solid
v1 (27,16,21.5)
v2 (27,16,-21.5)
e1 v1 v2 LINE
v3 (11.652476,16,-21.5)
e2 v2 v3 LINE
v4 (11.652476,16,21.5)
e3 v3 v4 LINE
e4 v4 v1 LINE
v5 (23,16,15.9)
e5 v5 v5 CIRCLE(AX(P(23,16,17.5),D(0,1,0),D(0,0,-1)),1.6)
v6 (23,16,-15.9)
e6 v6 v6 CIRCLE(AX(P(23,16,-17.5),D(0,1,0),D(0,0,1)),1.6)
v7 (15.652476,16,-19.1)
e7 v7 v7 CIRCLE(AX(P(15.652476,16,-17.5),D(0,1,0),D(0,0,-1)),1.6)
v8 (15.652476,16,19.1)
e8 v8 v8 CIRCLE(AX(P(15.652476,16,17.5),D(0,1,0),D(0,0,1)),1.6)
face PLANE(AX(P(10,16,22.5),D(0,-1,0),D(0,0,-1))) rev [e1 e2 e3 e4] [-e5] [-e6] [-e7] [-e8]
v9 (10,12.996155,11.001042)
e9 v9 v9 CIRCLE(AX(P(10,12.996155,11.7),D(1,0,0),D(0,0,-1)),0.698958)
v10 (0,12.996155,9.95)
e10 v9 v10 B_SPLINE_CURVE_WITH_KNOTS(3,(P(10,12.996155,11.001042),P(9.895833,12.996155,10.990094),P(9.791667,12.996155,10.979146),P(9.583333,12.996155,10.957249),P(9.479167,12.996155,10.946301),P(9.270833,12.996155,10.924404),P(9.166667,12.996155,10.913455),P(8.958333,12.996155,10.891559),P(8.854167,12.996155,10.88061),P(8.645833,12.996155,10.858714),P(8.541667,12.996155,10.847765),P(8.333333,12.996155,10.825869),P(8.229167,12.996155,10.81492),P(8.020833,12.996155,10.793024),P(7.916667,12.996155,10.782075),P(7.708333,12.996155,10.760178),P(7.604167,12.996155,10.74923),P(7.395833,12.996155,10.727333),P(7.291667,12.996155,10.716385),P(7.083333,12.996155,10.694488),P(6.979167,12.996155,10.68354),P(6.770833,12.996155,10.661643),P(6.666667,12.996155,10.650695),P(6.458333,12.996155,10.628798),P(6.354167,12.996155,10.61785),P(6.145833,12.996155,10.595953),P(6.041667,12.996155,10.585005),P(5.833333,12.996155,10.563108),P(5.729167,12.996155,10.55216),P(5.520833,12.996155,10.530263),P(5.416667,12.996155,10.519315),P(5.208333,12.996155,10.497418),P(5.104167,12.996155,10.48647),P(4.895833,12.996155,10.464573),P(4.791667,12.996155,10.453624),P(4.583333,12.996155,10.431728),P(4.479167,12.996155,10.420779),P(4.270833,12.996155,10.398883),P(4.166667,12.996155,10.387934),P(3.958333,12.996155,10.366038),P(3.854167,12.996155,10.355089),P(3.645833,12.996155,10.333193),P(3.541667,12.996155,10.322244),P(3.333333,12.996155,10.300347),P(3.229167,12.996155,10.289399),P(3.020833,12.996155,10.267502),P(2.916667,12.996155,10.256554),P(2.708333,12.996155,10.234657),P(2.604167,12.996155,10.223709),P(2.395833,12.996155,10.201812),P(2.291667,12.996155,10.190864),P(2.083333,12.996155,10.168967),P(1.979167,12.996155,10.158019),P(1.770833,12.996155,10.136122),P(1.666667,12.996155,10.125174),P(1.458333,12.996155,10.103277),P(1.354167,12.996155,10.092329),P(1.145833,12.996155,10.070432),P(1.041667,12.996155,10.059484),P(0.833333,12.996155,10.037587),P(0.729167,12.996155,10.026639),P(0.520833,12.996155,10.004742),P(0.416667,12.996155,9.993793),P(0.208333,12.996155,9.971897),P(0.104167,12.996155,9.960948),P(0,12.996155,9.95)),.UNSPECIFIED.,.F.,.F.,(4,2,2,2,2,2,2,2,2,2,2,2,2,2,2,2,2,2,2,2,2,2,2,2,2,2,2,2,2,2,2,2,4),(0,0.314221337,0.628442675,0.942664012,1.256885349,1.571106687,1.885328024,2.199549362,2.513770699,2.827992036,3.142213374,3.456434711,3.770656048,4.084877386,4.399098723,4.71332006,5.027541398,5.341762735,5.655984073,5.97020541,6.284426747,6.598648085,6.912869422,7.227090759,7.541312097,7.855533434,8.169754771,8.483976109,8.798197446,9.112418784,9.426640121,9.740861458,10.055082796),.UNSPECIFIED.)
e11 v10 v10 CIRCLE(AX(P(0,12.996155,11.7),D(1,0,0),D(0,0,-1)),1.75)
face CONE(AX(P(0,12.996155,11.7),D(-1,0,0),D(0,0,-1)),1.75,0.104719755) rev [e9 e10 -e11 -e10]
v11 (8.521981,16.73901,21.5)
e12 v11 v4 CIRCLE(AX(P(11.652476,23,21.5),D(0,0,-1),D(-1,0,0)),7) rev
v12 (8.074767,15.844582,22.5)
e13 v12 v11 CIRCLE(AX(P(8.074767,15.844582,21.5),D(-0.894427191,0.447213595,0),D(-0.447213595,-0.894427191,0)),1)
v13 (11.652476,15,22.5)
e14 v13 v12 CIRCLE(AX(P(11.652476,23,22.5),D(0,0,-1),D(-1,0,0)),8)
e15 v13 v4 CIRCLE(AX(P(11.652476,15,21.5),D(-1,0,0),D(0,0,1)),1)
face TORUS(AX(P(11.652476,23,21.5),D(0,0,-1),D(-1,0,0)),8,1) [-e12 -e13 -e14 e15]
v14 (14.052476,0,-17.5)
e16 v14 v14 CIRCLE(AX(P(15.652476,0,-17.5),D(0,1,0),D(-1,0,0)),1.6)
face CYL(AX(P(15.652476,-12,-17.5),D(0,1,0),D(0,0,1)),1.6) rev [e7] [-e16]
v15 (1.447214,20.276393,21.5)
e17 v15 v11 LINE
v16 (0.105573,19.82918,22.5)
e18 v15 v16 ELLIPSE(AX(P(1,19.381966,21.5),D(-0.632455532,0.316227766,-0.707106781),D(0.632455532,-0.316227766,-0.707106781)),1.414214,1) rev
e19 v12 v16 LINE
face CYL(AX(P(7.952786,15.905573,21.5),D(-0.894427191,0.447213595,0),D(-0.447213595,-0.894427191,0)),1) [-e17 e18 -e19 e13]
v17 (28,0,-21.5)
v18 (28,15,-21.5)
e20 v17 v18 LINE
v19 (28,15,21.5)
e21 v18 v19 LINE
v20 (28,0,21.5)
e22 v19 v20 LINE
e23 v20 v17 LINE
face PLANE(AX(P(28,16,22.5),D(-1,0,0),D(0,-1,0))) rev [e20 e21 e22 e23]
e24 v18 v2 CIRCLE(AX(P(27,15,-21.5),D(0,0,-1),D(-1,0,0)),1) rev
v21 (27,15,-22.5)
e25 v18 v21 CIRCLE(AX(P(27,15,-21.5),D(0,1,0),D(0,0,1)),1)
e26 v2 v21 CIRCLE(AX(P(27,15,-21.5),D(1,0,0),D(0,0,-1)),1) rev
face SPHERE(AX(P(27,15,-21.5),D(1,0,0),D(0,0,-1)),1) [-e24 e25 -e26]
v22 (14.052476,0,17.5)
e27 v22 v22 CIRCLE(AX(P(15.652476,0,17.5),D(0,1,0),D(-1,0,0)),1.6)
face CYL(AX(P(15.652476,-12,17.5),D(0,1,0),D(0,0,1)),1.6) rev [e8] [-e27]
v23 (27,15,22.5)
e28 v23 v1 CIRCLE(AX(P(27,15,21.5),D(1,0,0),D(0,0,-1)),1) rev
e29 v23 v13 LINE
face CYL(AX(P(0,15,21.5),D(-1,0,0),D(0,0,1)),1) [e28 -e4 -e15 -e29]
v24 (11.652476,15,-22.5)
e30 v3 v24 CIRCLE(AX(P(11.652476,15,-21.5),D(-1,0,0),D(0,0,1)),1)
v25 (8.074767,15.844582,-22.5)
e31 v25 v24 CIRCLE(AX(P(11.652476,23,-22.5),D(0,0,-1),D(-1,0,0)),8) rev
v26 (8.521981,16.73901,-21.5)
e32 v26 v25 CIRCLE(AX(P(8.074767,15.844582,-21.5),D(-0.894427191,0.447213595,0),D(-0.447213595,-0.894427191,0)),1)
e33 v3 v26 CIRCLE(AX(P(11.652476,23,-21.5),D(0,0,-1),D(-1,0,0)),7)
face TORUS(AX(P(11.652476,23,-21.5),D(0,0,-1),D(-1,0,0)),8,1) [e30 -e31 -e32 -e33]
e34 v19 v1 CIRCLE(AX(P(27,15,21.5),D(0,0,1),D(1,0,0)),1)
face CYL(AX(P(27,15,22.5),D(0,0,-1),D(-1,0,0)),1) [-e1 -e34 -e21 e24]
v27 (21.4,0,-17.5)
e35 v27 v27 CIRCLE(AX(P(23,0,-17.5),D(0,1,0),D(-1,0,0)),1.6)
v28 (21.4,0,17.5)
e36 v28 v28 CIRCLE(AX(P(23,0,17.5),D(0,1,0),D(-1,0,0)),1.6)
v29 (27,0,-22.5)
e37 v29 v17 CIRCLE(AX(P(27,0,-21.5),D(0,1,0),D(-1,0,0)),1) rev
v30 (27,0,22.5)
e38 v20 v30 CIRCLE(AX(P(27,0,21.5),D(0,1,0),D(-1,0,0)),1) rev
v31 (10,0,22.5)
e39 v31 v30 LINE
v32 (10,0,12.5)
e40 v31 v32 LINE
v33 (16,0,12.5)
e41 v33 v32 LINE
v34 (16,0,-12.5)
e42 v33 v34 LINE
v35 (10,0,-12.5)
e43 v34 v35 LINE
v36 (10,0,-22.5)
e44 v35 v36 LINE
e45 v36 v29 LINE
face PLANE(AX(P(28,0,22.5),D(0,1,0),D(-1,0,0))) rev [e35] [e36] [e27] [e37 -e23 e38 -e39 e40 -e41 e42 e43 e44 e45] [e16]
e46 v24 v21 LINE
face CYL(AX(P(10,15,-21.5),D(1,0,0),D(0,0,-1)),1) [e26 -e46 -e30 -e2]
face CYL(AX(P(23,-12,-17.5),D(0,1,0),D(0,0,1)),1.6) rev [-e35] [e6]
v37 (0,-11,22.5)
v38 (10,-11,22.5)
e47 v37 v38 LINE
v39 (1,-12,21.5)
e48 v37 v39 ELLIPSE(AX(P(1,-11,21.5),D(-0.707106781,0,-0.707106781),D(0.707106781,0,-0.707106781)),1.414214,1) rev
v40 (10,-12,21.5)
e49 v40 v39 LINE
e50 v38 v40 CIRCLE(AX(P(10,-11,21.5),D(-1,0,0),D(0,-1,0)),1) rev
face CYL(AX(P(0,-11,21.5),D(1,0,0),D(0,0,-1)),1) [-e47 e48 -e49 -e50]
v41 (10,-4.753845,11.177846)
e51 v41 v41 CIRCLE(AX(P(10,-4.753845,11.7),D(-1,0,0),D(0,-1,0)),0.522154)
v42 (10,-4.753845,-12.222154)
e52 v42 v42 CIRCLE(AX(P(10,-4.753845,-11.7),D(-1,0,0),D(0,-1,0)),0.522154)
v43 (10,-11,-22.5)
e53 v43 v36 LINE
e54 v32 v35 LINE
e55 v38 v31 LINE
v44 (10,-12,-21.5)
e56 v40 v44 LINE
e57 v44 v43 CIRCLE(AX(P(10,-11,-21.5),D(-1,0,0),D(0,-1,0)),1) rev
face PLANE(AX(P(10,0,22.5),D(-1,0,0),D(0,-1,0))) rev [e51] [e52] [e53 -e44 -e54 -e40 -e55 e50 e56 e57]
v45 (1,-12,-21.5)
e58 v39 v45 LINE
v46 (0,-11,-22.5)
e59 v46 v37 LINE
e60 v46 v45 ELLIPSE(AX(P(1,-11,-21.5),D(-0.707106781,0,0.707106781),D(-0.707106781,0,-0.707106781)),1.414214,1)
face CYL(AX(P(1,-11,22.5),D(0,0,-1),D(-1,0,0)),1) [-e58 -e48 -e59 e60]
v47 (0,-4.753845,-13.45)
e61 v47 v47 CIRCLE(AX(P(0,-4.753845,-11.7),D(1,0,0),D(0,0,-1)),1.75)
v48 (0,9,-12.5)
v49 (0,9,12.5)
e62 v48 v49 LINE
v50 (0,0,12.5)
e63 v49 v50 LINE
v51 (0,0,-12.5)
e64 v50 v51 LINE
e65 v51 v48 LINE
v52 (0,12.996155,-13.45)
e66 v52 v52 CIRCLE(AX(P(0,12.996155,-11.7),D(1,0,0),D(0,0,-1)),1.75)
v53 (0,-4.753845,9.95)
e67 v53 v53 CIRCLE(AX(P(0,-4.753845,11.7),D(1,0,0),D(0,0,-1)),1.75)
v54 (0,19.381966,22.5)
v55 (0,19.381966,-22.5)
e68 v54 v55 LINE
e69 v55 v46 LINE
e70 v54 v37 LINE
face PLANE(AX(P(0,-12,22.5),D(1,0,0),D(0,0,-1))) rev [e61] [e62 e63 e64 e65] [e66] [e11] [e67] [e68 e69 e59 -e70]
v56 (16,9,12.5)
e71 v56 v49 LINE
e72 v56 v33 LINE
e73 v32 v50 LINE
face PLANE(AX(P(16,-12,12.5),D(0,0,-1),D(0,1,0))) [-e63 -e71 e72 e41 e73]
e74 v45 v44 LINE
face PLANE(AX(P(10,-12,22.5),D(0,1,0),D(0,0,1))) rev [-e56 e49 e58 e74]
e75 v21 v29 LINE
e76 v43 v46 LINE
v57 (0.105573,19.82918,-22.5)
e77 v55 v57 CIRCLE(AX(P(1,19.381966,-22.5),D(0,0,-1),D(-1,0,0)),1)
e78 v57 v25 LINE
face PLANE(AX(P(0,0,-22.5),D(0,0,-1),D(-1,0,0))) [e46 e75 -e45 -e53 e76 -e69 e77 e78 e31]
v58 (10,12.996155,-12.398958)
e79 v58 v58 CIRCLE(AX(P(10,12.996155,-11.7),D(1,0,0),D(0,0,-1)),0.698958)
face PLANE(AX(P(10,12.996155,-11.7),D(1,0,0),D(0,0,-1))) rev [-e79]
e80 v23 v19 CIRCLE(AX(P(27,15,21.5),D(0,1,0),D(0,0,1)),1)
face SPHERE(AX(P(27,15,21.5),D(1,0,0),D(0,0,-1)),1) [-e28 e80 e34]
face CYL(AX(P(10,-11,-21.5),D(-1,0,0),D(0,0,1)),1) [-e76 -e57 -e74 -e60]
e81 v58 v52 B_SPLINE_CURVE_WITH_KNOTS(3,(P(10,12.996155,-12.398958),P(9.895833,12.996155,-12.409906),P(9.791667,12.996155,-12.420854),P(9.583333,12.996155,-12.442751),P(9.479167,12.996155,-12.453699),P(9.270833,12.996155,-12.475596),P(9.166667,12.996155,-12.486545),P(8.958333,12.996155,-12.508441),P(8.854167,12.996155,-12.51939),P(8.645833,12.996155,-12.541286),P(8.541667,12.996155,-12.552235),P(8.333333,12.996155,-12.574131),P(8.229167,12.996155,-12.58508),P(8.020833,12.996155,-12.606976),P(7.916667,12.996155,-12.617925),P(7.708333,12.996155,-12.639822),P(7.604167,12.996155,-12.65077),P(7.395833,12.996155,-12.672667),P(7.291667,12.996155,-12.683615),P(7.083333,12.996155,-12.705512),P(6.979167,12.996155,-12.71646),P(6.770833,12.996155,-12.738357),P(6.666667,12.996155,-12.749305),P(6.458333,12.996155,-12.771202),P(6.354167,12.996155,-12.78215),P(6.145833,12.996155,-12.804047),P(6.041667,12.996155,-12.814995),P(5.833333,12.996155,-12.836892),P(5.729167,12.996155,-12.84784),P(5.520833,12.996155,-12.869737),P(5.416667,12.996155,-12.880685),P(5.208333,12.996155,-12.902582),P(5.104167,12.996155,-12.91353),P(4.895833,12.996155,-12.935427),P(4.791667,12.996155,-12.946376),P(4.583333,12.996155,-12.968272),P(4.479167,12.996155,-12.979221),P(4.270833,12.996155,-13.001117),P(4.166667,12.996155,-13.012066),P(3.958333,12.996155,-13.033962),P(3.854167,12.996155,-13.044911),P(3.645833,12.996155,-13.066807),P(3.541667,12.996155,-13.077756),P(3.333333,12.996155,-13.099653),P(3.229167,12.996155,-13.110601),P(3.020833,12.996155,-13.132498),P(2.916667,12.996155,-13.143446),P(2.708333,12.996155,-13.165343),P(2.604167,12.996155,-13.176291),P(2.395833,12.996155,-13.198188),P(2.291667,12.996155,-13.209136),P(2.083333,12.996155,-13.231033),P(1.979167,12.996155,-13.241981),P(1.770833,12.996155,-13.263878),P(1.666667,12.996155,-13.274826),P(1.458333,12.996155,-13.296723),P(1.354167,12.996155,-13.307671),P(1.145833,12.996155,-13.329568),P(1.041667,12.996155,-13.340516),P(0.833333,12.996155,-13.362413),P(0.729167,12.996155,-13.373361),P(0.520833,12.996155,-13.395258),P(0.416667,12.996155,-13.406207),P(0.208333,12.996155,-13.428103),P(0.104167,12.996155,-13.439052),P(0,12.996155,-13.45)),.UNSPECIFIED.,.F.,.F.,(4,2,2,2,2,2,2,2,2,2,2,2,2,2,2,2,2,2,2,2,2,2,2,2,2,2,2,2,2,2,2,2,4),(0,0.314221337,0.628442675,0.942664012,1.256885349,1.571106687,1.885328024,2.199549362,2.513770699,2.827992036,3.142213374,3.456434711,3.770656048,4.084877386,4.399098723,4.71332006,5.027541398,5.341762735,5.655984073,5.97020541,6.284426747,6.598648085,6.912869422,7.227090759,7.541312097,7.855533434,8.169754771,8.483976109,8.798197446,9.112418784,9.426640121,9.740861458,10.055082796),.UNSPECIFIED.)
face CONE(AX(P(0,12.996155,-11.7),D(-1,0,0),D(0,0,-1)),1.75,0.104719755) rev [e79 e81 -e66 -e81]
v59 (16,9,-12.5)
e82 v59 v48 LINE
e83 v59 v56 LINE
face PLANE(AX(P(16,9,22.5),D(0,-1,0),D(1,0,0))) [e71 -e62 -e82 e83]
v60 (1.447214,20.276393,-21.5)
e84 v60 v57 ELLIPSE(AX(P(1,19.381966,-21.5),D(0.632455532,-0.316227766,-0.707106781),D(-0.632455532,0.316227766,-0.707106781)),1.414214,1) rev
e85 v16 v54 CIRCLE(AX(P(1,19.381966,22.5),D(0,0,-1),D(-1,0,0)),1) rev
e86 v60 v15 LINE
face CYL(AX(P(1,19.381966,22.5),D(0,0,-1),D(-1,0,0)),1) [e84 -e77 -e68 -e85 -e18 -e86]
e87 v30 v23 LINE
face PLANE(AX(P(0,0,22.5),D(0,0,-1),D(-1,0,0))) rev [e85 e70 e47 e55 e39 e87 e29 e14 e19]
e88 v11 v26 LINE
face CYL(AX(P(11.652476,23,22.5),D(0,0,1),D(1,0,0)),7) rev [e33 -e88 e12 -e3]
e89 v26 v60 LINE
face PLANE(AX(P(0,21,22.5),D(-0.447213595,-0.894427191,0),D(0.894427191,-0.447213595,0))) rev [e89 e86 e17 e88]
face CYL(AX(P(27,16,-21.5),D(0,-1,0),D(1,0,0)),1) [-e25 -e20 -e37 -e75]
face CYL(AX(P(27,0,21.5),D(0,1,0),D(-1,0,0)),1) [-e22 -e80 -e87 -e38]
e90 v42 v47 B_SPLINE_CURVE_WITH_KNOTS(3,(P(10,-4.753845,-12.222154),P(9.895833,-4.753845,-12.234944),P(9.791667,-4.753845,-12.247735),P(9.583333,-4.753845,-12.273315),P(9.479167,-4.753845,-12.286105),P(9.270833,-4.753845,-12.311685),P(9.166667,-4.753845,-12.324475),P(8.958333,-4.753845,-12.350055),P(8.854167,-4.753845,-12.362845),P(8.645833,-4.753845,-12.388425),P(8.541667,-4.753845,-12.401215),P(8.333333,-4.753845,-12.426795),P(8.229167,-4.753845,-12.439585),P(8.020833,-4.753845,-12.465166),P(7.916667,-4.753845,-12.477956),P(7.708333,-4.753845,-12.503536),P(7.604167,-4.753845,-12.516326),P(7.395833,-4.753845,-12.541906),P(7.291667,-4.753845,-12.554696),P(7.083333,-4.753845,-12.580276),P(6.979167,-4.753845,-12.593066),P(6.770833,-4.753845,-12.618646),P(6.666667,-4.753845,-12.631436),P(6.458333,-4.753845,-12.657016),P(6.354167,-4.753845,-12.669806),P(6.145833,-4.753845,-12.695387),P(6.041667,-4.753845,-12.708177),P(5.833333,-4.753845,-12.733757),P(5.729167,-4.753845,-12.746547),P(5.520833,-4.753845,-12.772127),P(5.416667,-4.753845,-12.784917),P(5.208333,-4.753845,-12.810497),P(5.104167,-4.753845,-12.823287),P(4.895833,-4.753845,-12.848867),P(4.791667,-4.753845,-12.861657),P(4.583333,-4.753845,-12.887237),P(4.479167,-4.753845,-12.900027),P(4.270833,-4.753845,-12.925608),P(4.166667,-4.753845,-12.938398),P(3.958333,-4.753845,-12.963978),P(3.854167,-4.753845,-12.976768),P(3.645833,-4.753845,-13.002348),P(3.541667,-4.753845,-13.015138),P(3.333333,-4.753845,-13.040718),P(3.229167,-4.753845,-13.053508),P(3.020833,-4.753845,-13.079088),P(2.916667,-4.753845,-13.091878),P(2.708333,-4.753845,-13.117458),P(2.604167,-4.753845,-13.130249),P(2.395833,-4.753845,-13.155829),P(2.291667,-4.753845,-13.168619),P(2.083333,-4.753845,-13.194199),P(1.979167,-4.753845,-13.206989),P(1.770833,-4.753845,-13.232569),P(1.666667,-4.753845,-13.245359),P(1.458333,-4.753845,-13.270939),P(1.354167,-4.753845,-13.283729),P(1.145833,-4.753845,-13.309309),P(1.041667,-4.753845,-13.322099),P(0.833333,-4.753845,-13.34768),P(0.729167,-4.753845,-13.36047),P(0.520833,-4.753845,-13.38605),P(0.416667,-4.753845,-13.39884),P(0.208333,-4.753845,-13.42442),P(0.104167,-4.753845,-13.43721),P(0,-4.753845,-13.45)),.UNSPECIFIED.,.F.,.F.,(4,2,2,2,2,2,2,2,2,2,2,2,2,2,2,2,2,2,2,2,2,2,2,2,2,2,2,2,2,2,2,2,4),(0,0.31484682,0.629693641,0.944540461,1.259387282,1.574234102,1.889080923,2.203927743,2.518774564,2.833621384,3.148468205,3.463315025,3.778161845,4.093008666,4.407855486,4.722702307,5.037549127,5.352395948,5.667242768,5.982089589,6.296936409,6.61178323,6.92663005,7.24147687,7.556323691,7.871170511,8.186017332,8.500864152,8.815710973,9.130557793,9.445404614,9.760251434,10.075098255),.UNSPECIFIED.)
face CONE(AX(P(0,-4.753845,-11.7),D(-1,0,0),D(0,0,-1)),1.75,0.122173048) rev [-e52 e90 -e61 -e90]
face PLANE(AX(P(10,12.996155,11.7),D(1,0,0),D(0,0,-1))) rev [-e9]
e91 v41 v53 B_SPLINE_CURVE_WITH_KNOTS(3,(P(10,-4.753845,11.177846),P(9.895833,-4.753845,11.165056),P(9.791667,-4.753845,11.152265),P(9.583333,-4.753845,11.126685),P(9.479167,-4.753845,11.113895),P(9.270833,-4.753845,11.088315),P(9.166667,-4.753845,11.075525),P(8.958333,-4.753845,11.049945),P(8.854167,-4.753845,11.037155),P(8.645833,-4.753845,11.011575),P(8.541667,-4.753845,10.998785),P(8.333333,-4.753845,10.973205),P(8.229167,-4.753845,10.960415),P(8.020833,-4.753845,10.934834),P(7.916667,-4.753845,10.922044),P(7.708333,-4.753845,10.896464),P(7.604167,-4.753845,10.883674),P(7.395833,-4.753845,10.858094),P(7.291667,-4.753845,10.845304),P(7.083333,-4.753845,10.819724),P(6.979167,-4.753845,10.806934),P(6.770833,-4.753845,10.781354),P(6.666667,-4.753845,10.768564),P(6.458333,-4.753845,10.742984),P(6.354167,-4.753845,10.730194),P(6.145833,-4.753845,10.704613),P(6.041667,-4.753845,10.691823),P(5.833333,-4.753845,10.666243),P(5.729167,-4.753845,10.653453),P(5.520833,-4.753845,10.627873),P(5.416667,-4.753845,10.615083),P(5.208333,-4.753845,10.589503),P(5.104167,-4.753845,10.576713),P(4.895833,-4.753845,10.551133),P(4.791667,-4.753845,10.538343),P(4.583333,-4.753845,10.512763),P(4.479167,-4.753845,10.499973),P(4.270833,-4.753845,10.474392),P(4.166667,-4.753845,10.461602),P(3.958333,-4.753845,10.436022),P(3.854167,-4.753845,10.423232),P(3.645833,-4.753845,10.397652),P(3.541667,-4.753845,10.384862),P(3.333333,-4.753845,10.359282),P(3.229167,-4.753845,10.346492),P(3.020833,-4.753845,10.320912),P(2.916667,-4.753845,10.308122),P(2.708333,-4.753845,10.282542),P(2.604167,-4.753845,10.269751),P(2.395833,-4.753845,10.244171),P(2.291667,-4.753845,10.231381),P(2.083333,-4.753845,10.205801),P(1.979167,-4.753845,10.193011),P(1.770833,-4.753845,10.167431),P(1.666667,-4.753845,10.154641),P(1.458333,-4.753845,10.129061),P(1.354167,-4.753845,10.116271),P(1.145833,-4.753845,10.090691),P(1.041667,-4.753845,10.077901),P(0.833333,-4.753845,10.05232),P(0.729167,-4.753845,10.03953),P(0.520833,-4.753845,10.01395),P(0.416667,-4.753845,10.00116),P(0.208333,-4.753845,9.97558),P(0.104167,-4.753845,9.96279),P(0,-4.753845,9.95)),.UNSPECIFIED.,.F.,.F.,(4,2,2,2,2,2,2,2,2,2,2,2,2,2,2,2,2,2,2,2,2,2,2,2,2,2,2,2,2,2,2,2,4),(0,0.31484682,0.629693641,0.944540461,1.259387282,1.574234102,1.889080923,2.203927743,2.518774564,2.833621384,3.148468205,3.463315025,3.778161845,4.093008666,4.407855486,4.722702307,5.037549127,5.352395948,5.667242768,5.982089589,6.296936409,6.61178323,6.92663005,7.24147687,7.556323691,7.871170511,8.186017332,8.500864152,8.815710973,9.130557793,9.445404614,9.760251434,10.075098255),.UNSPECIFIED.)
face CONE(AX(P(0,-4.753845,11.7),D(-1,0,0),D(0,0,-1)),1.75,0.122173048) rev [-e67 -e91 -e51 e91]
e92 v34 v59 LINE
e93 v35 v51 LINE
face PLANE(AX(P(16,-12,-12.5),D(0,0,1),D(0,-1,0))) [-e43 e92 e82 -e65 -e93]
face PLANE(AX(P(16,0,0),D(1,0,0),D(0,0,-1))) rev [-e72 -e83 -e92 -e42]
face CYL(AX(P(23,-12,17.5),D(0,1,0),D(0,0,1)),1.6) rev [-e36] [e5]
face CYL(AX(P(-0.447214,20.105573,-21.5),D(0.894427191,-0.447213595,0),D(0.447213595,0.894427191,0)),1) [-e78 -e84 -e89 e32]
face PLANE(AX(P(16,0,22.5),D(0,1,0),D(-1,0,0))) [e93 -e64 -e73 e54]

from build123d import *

# Parameters (mm, degrees)
BOSS_EXTRUDE1_DEPTH          = 22.5
CUT_EXTRUDE1_START           = -28
SKETCH12_W                   = 25
SKETCH12_H                   = 9
CUT_EXTRUDE1_DEPTH           = 16
CUT_EXTRUDE2_START           = -28
SKETCH13_R                   = 1.75
CUT_EXTRUDE2_DEPTH           = 10
CUT_EXTRUDE2_DRAFT           = 6
CUT_EXTRUDE2_PROFILE_2_DEPTH = 10
CUT_EXTRUDE2_PROFILE_2_DRAFT = 6
FILLET1_R                    = 7
FILLET2_R                    = 1
SKETCH17_R                   = 1.6
CUT_EXTRUDE5_DEPTH           = 46.543934832


# Read off the part's stored shape, not the designer's step: Cut-Extrude3
with BuildPart() as part:
    # Sketch1 → Boss-Extrude1 (new, symmetric)
    with BuildSketch(Plane.XY):
        Polygon((10, 16), (28, 16), (28, 0), (10, 0), (10, -12), (0, -12), (0, 0), (0, 21), align=None)
    extrude(amount=BOSS_EXTRUDE1_DEPTH, both=True)

    # Sketch12 → Cut-Extrude1 (cut)
    with BuildSketch(Plane(origin=(28, 0, 0), x_dir=(0, 0, -1), z_dir=(1, 0, 0)).offset(CUT_EXTRUDE1_START)):
        with Locations((0, 4.5)):
            Rectangle(SKETCH12_W, SKETCH12_H)
    extrude(amount=CUT_EXTRUDE1_DEPTH, mode=Mode.SUBTRACT)


with BuildPart() as cut_extrude2_tool:
    # Sketch13 → Cut-Extrude2 (with draft: the straight prism first)
    with BuildSketch(Plane(origin=(28, 0, 0), x_dir=(0, 0, -1), z_dir=(1, 0, 0)).offset(CUT_EXTRUDE2_START)):
        with Locations((11.7, 12.996154984)):
            Circle(SKETCH13_R)
    extrude(amount=CUT_EXTRUDE2_DEPTH)
    # Cut-Extrude2: the draft: its side faces are tilted about the plane it starts from
    cut_extrude2_sides = [cut_extrude2_tool.faces().sort_by_distance(p)[0] for p in [
        (5, 12.996154984, -9.95),
    ]]
    draft(cut_extrude2_sides, Plane(origin=(28, 0, 0), x_dir=(0, 0, -1), z_dir=(1, 0, 0)).offset(CUT_EXTRUDE2_START), CUT_EXTRUDE2_DRAFT)


with BuildPart() as part_1:
    add(part.part)

    # Cut-Extrude2: cut by cut_extrude2_tool
    add(cut_extrude2_tool.part, mode=Mode.SUBTRACT)


with BuildPart() as cut_extrude2_profile_2_tool:
    # Sketch13 → Cut-Extrude2 profile 2 (with draft: the straight prism first)
    with BuildSketch(Plane(origin=(28, 0, 0), x_dir=(0, 0, -1), z_dir=(1, 0, 0)).offset(CUT_EXTRUDE2_START)):
        with Locations((-11.7, 12.996154984)):
            Circle(SKETCH13_R)
    extrude(amount=CUT_EXTRUDE2_PROFILE_2_DEPTH)
    # Cut-Extrude2 profile 2: the draft: its side faces are tilted about the plane it starts from
    cut_extrude2_profile_2_sides = [cut_extrude2_profile_2_tool.faces().sort_by_distance(p)[0] for p in [
        (5, 12.996154984, 13.45),
    ]]
    draft(cut_extrude2_profile_2_sides, Plane(origin=(28, 0, 0), x_dir=(0, 0, -1), z_dir=(1, 0, 0)).offset(CUT_EXTRUDE2_START), CUT_EXTRUDE2_PROFILE_2_DRAFT)


with BuildPart() as part_2:
    add(part_1.part)

    # Cut-Extrude2 profile 2: cut by cut_extrude2_profile_2_tool
    add(cut_extrude2_profile_2_tool.part, mode=Mode.SUBTRACT)

    # Cut-Extrude3 outline → Cut-Extrude3 (revolve, cut)
    with BuildSketch(Plane(origin=(0, -4.753845016, 11.7), x_dir=(0, 1, 0), z_dir=(0, 0, -1))):
        Polygon((0, 0), (1.75, 0), (0.522154391, 10), (0, 10), align=None)
    revolve(axis=Axis((0, -4.753845016, 11.7), (1, 0, 0)), mode=Mode.SUBTRACT)

    # Cut-Extrude3 2 outline → Cut-Extrude3 2 (revolve, cut)
    with BuildSketch(Plane(origin=(0, -4.753845016, -11.7), x_dir=(0, 1, 0), z_dir=(0, 0, -1))):
        Polygon((0, 0), (1.75, 0), (0.522154391, 10), (0, 10), align=None)
    revolve(axis=Axis((0, -4.753845016, -11.7), (1, 0, 0)), mode=Mode.SUBTRACT)

    # Fillet1
    fillet1_edges = [part_2.edges().sort_by_distance(p)[0] for p in [
        (10, 16, 0),
    ]]
    fillet(fillet1_edges, radius=FILLET1_R)

    # Fillet2
    fillet2_edges = [part_2.edges().sort_by_distance(p)[0] for p in [
        (5, -12, -22.5),
        (28, 16, 0),
        (0, -12, 0),
        (0, 21, 0),
        (5, -12, 22.5),
        (28, 8, 22.5),
        (19.826237921, 16, 22.5),
        (4.260990337, 18.869504832, -22.5),
        (4.260990337, 18.869504832, 22.5),
        (10.044205399, 16.187257074, -22.5),
        (10.044205399, 16.187257074, 22.5),
        (19.826237921, 16, -22.5),
        (28, 8, -22.5),
    ]]
    fillet(fillet2_edges, radius=FILLET2_R)

    # Sketch17 → Cut-Extrude5 (cut, through all)
    with BuildSketch(Plane(origin=(0, 16, 0), x_dir=(1, 0, 0), z_dir=(0, 1, 0))):
        with Locations(Location((23, 17.5, 0), (0, 0, 270))):
            Circle(SKETCH17_R)
        with Locations(Location((15.652475842, 17.5, 0), (0, 0, 180))):
            Circle(SKETCH17_R)
        with Locations(Location((15.652475842, -17.5, 0), (0, 0, 270))):
            Circle(SKETCH17_R)
        with Locations(Location((23, -17.5, 0), (0, 0, 180))):
            Circle(SKETCH17_R)
    extrude(amount=-CUT_EXTRUDE5_DEPTH, mode=Mode.SUBTRACT)


solid = part_2.part
